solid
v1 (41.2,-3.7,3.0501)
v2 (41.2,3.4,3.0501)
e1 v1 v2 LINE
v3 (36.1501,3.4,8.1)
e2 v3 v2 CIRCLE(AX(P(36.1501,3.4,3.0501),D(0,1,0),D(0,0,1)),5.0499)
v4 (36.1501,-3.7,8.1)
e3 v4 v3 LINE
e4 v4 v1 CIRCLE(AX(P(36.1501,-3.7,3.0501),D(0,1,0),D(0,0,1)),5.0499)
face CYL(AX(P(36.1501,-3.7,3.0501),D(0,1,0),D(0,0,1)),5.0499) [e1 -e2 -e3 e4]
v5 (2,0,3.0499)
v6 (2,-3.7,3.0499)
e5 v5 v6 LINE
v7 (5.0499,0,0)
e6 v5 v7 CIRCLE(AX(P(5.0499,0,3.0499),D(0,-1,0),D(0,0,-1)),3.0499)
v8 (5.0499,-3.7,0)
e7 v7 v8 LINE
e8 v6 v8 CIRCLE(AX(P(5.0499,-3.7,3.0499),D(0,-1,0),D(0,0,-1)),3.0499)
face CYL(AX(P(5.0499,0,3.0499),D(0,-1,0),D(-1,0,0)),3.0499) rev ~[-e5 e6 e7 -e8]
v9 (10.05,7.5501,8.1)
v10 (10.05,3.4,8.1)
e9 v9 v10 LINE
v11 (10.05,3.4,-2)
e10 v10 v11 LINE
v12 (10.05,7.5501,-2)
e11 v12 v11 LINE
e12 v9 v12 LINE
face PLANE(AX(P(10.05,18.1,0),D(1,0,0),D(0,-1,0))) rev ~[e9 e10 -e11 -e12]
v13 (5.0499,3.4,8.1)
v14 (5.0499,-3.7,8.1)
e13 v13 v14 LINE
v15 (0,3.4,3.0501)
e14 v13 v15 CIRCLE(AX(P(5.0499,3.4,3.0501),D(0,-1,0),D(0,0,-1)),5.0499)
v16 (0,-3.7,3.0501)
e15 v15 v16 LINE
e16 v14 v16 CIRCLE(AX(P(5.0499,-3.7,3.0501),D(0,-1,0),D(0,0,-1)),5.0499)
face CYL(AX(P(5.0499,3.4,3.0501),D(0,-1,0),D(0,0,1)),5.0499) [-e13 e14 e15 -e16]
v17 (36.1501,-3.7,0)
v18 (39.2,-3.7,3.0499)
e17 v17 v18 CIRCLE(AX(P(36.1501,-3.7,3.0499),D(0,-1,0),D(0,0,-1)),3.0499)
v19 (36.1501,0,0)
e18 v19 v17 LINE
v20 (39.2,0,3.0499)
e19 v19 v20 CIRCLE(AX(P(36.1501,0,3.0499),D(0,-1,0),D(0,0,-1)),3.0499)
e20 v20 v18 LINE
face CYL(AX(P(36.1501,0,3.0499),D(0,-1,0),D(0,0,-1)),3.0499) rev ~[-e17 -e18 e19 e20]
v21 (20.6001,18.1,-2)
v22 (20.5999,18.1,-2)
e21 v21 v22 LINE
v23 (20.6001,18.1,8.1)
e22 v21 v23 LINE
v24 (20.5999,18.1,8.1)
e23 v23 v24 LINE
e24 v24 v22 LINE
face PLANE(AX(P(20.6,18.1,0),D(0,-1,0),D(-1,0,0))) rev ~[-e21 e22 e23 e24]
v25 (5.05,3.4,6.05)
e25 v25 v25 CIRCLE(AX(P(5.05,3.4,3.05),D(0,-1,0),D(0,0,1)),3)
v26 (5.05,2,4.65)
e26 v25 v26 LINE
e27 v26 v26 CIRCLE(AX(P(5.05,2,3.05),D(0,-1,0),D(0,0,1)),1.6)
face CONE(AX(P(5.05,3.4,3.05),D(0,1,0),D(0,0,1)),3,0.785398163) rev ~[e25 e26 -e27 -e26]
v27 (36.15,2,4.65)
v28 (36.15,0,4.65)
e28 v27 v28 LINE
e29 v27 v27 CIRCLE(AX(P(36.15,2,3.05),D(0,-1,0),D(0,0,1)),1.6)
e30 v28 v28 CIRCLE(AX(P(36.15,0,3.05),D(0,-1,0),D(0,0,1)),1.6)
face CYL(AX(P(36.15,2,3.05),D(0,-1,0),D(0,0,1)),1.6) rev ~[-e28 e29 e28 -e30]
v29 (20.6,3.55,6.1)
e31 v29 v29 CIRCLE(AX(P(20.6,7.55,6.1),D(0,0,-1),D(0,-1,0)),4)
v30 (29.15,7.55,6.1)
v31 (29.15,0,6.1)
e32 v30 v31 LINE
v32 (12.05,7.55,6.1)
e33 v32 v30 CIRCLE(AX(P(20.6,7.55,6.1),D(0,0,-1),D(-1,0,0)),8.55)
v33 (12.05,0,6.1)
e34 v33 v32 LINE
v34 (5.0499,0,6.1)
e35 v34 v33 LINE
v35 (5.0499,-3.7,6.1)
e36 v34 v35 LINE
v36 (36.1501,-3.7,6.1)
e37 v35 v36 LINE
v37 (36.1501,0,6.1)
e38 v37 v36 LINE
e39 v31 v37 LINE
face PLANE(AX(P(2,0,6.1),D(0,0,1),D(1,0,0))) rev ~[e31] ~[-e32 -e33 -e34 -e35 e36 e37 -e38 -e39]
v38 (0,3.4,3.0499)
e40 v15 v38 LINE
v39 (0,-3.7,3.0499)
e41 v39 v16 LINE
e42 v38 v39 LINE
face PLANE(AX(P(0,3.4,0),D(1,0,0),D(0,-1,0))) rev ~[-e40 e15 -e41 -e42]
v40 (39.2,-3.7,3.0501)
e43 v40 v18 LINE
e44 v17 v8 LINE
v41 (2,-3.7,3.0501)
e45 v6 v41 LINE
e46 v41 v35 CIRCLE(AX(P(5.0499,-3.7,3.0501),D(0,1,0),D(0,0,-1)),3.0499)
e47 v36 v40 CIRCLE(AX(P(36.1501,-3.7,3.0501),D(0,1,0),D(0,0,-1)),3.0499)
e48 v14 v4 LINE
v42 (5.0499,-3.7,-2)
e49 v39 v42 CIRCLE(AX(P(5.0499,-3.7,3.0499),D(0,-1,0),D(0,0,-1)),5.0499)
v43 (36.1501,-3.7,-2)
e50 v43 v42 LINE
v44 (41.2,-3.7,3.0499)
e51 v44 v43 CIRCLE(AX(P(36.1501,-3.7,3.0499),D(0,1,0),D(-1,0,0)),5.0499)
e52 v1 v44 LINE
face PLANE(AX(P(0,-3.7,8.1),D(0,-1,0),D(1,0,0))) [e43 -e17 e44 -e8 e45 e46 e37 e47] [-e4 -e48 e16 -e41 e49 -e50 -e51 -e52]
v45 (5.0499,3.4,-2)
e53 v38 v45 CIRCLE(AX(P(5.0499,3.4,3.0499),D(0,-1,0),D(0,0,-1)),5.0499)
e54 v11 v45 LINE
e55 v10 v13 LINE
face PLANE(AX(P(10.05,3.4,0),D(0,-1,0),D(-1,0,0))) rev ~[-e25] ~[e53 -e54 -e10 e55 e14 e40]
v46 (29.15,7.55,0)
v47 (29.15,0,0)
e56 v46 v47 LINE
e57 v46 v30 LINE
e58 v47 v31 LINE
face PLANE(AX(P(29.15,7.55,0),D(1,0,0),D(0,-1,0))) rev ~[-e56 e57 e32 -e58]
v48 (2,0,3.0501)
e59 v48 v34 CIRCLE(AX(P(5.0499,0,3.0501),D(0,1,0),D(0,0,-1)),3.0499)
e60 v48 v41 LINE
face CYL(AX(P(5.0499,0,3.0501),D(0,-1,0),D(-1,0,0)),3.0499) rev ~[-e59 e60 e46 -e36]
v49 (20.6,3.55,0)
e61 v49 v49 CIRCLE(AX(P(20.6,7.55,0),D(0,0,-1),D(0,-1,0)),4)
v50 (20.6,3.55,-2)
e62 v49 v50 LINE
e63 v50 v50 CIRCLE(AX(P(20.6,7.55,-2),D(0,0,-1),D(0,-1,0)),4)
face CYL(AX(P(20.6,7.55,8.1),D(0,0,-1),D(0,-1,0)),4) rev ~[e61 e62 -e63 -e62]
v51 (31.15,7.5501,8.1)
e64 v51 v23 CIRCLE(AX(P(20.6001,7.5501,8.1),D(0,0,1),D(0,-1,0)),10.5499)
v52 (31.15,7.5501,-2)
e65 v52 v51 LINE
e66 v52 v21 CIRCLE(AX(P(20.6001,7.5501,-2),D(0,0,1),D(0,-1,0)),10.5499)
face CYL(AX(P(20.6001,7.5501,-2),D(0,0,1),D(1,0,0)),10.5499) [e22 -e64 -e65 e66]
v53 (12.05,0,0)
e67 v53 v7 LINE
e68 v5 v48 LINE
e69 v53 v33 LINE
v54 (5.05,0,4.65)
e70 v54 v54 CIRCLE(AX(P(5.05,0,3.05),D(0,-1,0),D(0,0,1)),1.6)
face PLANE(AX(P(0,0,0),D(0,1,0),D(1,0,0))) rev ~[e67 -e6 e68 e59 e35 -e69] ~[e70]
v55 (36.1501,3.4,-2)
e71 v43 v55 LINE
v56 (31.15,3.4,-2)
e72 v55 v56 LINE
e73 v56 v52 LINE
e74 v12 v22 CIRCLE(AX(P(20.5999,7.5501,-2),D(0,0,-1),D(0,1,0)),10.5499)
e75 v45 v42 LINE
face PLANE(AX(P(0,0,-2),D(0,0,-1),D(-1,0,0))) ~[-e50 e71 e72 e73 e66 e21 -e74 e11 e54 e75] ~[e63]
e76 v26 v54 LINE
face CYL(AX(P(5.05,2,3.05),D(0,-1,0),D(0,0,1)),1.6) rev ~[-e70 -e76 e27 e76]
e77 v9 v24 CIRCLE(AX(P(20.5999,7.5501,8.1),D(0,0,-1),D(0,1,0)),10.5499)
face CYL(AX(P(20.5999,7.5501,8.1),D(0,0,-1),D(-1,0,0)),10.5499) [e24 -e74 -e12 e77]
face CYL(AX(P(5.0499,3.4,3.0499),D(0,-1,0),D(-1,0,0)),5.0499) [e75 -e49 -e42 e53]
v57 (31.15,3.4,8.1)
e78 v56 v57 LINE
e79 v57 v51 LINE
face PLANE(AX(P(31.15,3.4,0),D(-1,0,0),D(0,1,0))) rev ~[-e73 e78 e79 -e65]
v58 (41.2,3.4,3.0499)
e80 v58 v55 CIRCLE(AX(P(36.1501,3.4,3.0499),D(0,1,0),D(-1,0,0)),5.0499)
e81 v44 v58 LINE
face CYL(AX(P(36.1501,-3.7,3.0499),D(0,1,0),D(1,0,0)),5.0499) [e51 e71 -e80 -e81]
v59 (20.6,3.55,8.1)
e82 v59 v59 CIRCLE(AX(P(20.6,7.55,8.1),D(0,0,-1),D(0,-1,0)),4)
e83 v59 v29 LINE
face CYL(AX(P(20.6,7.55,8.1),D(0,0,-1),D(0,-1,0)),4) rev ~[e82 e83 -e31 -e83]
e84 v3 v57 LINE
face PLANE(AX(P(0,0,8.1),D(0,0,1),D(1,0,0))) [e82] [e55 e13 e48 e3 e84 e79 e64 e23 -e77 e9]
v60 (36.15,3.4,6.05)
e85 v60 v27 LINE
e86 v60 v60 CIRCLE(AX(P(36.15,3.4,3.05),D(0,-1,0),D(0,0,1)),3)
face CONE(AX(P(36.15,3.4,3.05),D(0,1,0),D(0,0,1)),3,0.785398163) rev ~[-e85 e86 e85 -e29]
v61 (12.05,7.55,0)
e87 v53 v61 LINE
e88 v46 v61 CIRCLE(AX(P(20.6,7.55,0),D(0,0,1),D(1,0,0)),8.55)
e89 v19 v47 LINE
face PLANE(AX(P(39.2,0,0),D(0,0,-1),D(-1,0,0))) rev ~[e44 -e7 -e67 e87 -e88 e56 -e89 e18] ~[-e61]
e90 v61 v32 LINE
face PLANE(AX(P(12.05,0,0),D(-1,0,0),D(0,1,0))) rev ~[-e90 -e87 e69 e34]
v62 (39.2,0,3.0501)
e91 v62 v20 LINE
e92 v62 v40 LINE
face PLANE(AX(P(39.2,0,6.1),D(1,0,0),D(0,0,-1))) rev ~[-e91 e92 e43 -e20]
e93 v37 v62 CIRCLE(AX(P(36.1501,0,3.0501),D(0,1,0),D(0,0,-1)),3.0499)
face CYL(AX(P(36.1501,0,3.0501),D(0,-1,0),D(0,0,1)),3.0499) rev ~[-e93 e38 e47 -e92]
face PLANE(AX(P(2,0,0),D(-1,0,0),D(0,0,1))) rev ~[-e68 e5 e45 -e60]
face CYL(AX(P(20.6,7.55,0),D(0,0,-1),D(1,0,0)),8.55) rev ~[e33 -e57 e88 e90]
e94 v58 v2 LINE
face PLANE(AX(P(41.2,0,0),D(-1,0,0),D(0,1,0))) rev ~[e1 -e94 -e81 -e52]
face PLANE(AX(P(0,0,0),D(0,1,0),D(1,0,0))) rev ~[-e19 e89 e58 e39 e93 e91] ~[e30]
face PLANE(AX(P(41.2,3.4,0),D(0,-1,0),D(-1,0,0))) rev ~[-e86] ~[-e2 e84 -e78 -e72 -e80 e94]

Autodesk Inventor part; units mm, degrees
ref_plane "YZ Plane" through (0, 0, 0) normal (1, 0, 0) x (0, 1, 0)
ref_plane "XZ Plane" through (0, 0, 0) normal (0, 1, 0) x (-1, 0, 0)
sketch "Эскиз2" plane through (0, 0, 0) normal (0, 0, 1) x (1, 0, 0)
  line L0 (0, 0) -> (10.05, 0)
  line L1 (10.05, 0) -> (10.05, 3.4)
  line L2 (10.05, 3.4) -> (0, 3.4)
  line L3 (0, 3.4) -> (0, 0)
  line L4 (10.05, 0) -> (31.15, 0)
  line L5 (31.15, 0) -> (31.15, 18.1)
  line L6 (31.15, 18.1) -> (10.05, 18.1)
  line L7 (10.05, 18.1) -> (10.05, 0)
  line L8 (31.15, 0) -> (41.2, 0)
  line L9 (41.2, 0) -> (41.2, 3.4)
  line L10 (41.2, 3.4) -> (31.15, 3.4)
  line L11 (31.15, 3.4) -> (31.15, 0)
  line L12 (20.6, 18.1) -> (20.6, 7.55)
  circle A0 centre (20.6, 7.55) radius 8.55
  line L13 (7, 0) -> (26, 0)
  line L14 (12.05, 7.55) -> (29.15, 7.55)
  line L15 (29.15, 7.55) -> (29.15, 0)
  line L16 (29.15, 0) -> (12.05, 0)
  line L17 (12.05, 0) -> (12.05, 7.55)
  point P0 (31.15, 3.4)
  point P1 (16.5875, 0)
  point P2 (24.6125, 0)
  point P3 (12.05, 0)
  point P4 (12.05, 7.55)
  point P5 (29.15, 0)
  dimension "d14" = 17.1
  dimension "d0" = 10.05
  dimension "d1" = 21.1
  dimension "d2" = 18.1
  dimension "d3" = 3.4
  dimension "d4" = 10.05
  dimension "d13" = 10.55
  dimension "d15" = 3.4
extrude "Выдавливание1" add sketch "Эскиз2" along normal blind 6.1 contours L3 L2 L1 L0 | L1 L7 L6 L12 A0 L17 L4 | L6 L5 L4 L15 A0 L12 | L10 L9 L8 L5
sketch "Эскиз4" plane through (0, 0, 6.1) normal (0, 0, 1) x (1, 0, 0)
  line L0 (0, 0) -> (12.05, 0) projected
  line L1 (12.05, 0) -> (12.05, 7.55) projected
  arc A0 (29.15, 7.55) -> (12.05, 7.55) centre (20.6, 7.55) ccw projected
  line L2 (29.15, 7.55) -> (29.15, 0) projected
  line L3 (41.2, 0) -> (41.2, 3.4) projected
  line L4 (41.2, 3.4) -> (31.15, 3.4) projected
  line L5 (31.15, 3.4) -> (31.15, 18.1) projected
  line L6 (31.15, 18.1) -> (10.05, 18.1) projected
  line L7 (10.05, 18.1) -> (10.05, 3.4) projected
  line L8 (10.05, 3.4) -> (0, 3.4) projected
  line L9 (0, 3.4) -> (0, 0) projected
  line L10 (12.05, 0) -> (29.15, 0)
  line L11 (29.15, 0) -> (41.2, 0) projected
extrude "Выдавливание3" add sketch "Эскиз4" along normal blind 2
ref_plane "РабПлоскость1" through (0, 0, 3.05) normal (0, 0, 1) x (1, 0, 0)
mirror "Зеркальное отражение2" about plane through (0, 0, 3.05) normal (0, 0, 1) of "Выдавливание3"
fillet "Сопряжение2" radius 10.55 2 edges at (31.15, 18.1, 3.05) (10.05, 18.1, 3.05)
sketch "Эскиз6" plane through (31.15, 3.4, 8.1) normal (0, 1, 0) x (1, 0, 0)
  line L0 (10.05, 10.1) -> (10.05, 0) projected
  line L1 (10.05, 5.05) -> (0, 5.05)
  line L2 (0, 10.1) -> (0, 0) projected
  line L3 (-21.1, 10.1) -> (-21.1, 0) projected
  line L4 (-21.1, 5.05) -> (-31.15, 5.05)
  line L5 (-31.15, 0) -> (-31.15, 10.1) projected
  line L6 (-26.125, 5.05) -> (-26.1, 5.05)
  line L7 (5.025, 5.05) -> (5, 5.05)
  point P0 (-31.15, 8.1)
  dimension "d35" = 0.025
  dimension "d36" = 0.025
hole "Отверстие2" at (5.05, 3.4, 3.05) at (36.15, 3.4, 3.05) direction (0, -1, 0) diameter 3.2 end through all countersink diameter 6 countersink angle 90
sketch "Эскиз7" plane through (0, 0, 8.1) normal (0, -1, 0) x (1, 0, 0)
  line L0 (0, -10.1) -> (0, 0) projected
  line L1 (41.2, -10.1) -> (31.15, -10.1) projected
  line L2 (0, 0) -> (41.2, 0)
  line L3 (41.2, 0) -> (41.2, -10.1)
  line L4 (41.2, -10.1) -> (0, -10.1)
  line L5 (0, -10.1) -> (0, 0)
  line L6 (0, 0) -> (2, 0)
  line L7 (2, 0) -> (2, -2)
  line L8 (2, -2) -> (39.2, -2)
  line L9 (39.2, -2) -> (39.2, -8.1)
  line L10 (39.2, -8.1) -> (2, -8.1)
  line L11 (2, -8.1) -> (2, -2)
  line L12 (41.2, -10.1) -> (41.2, 0) projected
  line L13 (41.2, -10.1) -> (39.2, -10.1)
  line L14 (39.2, -10.1) -> (39.2, -8.1)
  point P0 (0, -8.1)
  dimension "d37" = 2
  dimension "d38" = 2
  dimension "d39" = 2
  dimension "d40" = 2
extrude "Выдавливание4" add sketch "Эскиз7" along normal blind 3.7 contours L0 L2 L7 L11 L10 L14 L1 L4 | L2 L3 L1 L14 L9 L8 L7
sketch "Эскиз8" plane through (0, 0, 8.1) normal (0, 0, 1) x (1, 0, 0)
  arc A0 (31.15, 7.55) -> (10.05, 7.55) centre (20.6, 7.55) ccw projected
  point P0 (0, 0)
hole "Отверстие3" at (20.6, 7.55, 8.1) direction (0, 0, -1) diameter 8 end through all
fillet "Сопряжение3" radius 5.05 2 edges at (0, -0.15, 8.1) (0, -0.15, -2)
fillet "Сопряжение4" radius 5.05 2 edges at (41.2, -0.15, 8.1) (41.2, -0.15, -2)
fillet "Сопряжение5" radius 3.05 2 edges at (2, -1.85, 6.1) (2, -1.85, 0)
fillet "Сопряжение6" radius 3.05 2 edges at (39.2, -1.85, 0) (39.2, -1.85, 6.1)
equation "\"d0\" = d4"
equation "\"d15\" = d3"
equation "\"Радиус_гибки\" = Толщина"
equation "\"Ширина_просечки\" = Толщина"
equation "\"Глубина_просечки\" = 0.5 * Толщина"
equation "\"Размер_просечки\" = 4 * Толщина"
equation "\"Мин_остаток\" = 2 * Толщина"
equation "\"Радиус_перехода\" = Радиус_гибки"
equation "\"Радиус_Якоби\" = Толщина"
equation "\"Размер_зазора\" = Толщина"
equation "\"Толщина\" = 0.5"
properties part number "Крышка стойки подшипника"
